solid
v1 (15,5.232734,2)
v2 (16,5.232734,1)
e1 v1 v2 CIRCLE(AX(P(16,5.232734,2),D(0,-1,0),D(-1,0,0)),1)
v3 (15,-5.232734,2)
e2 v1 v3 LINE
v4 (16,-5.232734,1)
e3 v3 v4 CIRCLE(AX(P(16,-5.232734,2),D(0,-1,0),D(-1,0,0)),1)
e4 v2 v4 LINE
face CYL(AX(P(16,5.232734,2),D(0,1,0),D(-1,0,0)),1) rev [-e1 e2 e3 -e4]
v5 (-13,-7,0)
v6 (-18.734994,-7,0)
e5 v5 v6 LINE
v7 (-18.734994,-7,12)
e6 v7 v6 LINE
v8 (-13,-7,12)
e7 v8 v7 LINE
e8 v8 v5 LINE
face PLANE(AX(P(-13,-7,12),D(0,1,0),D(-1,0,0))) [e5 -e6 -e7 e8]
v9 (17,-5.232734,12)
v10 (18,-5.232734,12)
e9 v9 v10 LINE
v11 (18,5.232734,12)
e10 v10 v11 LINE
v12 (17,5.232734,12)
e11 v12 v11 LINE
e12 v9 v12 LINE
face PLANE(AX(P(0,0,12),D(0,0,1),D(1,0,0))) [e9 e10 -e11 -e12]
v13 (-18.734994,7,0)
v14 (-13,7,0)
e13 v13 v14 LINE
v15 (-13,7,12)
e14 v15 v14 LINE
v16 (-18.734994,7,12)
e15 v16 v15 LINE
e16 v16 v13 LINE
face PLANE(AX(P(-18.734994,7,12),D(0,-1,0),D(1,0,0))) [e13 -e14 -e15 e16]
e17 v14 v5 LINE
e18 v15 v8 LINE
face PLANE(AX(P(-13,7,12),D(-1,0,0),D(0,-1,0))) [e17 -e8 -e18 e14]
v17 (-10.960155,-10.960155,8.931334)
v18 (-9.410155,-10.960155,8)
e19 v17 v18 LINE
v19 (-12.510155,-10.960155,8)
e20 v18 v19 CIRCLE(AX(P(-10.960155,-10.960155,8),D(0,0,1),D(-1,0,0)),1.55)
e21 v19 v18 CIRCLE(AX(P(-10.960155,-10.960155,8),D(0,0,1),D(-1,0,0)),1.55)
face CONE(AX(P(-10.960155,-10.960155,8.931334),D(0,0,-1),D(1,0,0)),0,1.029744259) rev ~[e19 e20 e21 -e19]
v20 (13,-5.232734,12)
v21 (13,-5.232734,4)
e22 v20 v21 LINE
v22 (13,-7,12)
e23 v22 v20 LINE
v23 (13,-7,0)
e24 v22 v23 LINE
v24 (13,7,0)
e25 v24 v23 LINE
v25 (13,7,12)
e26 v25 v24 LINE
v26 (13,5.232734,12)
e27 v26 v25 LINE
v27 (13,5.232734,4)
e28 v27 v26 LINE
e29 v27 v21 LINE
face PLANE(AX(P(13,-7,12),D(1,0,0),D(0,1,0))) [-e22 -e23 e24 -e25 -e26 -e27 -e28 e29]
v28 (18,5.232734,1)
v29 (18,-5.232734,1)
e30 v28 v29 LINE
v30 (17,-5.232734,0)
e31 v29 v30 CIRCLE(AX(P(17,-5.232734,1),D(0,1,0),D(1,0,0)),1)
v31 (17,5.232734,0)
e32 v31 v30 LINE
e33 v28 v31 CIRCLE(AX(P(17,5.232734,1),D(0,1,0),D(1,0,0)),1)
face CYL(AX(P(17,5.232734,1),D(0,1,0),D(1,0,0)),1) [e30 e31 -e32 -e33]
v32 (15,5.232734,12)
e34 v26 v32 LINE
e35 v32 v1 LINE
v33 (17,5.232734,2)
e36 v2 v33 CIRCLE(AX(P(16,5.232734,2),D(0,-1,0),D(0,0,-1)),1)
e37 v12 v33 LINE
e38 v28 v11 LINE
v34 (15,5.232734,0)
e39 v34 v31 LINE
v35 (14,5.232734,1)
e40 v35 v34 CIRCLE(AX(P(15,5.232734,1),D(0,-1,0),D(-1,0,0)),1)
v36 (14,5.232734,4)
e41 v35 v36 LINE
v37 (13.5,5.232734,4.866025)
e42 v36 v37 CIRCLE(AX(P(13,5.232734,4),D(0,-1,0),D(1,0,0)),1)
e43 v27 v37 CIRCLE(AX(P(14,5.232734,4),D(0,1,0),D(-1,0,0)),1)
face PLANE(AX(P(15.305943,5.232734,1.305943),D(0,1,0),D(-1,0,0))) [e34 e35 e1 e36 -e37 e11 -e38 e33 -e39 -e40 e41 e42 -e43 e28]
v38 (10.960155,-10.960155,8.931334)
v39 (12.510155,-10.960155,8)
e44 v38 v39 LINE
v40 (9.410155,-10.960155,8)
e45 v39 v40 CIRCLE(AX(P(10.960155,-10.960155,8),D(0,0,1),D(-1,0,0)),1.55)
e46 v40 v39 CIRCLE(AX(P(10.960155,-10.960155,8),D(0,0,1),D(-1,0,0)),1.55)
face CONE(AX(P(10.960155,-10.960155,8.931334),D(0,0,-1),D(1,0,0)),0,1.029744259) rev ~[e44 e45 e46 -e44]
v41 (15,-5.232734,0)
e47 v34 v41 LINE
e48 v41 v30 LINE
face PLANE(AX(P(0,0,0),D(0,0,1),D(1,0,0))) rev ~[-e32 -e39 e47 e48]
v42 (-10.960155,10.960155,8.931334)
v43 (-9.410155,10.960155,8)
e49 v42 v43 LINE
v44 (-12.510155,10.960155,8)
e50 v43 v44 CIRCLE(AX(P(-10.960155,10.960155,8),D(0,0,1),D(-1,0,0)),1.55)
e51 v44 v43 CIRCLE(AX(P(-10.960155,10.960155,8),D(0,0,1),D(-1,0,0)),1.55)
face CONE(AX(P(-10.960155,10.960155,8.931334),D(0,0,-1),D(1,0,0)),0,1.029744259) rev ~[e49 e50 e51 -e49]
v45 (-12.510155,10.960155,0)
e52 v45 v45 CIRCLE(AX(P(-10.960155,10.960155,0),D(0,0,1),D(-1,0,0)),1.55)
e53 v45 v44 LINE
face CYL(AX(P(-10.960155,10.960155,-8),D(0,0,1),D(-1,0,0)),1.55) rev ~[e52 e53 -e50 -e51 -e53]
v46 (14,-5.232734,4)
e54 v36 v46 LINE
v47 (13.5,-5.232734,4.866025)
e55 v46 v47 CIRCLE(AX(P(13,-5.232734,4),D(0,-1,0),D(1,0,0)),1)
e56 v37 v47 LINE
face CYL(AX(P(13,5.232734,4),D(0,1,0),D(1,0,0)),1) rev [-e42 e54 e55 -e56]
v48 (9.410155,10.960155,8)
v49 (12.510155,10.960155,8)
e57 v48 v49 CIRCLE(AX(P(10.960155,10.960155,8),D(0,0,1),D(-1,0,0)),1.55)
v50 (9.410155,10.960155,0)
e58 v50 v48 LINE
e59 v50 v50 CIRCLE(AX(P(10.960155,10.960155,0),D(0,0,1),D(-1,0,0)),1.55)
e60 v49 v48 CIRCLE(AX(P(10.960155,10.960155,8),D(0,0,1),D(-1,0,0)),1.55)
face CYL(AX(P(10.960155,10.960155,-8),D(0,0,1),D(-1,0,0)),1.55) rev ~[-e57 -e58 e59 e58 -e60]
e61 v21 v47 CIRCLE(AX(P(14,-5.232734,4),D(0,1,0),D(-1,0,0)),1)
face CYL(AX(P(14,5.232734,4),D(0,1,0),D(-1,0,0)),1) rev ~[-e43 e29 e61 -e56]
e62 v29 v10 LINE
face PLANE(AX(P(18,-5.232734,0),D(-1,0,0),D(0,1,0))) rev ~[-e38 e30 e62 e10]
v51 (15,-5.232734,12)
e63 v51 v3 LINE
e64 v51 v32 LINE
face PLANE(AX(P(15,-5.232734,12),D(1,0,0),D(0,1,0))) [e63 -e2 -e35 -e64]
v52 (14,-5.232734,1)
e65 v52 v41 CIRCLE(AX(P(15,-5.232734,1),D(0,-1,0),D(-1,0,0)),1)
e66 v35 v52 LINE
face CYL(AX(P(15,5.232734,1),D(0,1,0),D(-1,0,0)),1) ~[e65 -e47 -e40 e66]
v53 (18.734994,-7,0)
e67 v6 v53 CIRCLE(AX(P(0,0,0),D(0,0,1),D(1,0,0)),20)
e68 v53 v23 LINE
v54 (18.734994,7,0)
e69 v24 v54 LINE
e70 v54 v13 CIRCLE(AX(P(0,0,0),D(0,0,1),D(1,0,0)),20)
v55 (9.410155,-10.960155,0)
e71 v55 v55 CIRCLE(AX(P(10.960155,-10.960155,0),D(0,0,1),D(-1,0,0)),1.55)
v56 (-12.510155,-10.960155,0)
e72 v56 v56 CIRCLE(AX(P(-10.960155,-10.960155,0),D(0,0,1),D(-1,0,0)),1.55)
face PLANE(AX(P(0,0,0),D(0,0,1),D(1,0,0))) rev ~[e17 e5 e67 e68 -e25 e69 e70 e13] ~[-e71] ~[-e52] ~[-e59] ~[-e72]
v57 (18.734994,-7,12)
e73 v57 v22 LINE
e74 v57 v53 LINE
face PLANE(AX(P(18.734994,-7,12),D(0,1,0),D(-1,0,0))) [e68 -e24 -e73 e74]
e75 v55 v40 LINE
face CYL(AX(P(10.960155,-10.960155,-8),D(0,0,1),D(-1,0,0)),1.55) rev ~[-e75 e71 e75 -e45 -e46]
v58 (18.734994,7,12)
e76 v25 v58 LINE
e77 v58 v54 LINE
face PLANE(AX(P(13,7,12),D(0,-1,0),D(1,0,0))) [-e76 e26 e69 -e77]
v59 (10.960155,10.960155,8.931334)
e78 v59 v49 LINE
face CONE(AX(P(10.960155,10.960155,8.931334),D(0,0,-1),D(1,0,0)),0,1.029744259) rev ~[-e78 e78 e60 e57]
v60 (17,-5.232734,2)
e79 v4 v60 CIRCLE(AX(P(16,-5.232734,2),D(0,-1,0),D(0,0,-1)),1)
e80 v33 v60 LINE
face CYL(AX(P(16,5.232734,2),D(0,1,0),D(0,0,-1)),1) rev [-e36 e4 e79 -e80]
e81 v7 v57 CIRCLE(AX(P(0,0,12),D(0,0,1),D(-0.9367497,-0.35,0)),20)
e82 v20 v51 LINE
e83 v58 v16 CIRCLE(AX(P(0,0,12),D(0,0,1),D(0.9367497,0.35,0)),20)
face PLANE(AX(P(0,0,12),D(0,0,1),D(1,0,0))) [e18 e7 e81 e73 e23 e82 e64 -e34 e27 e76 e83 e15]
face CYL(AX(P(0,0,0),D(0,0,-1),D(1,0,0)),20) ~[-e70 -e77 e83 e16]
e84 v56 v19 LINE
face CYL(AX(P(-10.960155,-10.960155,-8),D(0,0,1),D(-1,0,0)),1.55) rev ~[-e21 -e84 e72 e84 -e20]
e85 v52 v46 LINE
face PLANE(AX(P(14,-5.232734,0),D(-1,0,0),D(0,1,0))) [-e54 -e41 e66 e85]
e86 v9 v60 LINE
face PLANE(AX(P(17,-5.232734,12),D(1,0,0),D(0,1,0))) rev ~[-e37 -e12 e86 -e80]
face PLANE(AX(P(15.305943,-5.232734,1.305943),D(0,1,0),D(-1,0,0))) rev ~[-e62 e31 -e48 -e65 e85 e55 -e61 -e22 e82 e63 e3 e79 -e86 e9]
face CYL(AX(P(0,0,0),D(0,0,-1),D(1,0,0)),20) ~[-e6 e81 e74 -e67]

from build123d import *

# Parameters (mm, degrees)
F0_R         = 20
F1_DEPTH     = 12
F3_D         = 3.1
F3_DEPTH     = 8
F3_TIP       = 0.9313339595
F5_DEPTH     = 12.001
F6_W         = 5
F6_H         = 10.46546828
F7_DEPTH     = 12
F8_W         = 2
F8_H         = 10.46546828
F9_DEPTH     = 11
F10_W        = 1
F10_H        = 10.46546828
F11_DEPTH    = 5
F12_T1_DEPTH = 10.46546828
F12_T3_DEPTH = 10.46546828


# Not quite as in the source:
# - a fillet or chamfer that OpenCascade refuses, or shapes differently, is made with other operations: its cross-section is extruded or revolved along the edge and cut away or added


with BuildPart() as f1:
    # F0 (on Top) → F1 (new body)
    with BuildSketch(Plane.XY):
        Circle(F0_R)
    extrude(amount=F1_DEPTH)

    # F3
    with Locations(Plane(origin=(0, 0, 0), x_dir=(1, 0, 0), z_dir=(0, 0, -1))):
        with Locations((-10.9601551084, 10.9601551084), (-10.9601551084, -10.9601551084), (10.9601551084, -10.9601551084), (10.9601551084, 10.9601551084)):
            Hole(F3_D / 2, depth=F3_DEPTH)
            with Locations((0, 0, -(F3_DEPTH + F3_TIP / 2))):  # 118° drill point
                Cone(0, F3_D / 2, F3_TIP, mode=Mode.SUBTRACT)

    # F4 (on face) → F5 (intersect, through all)
    with BuildSketch(Plane.XY.offset(12)):
        with BuildLine():
            Line((13, -7), (13, 7))
            Line((13, 7), (18.7349939952, 7))
            ThreePointArc((18.7349939952, 7), (0, 20), (-18.7349939952, 7))
            Line((-18.7349939952, 7), (-13, 7))
            Line((-13, 7), (-13, -7))
            Line((-13, -7), (-18.7349939952, -7))
            ThreePointArc((-18.7349939952, -7), (0, -20), (18.7349939952, -7))
            Line((18.7349939952, -7), (13, -7))
        make_face()
    extrude(amount=-F5_DEPTH, mode=Mode.INTERSECT)

    # F6 (on Top) → F7 (join)
    with BuildSketch(Plane.XY):
        with Locations((15.5, 0)):
            Rectangle(F6_W, F6_H)
    extrude(amount=F7_DEPTH)

    # F8 (on face) → F9 (cut)
    with BuildSketch(Plane.XY.offset(12)):
        with Locations((16, 0)):
            Rectangle(F8_W, F8_H)
    extrude(amount=-F9_DEPTH, mode=Mode.SUBTRACT)

    # F10 (on Top) → F11 (cut)
    with BuildSketch(Plane.XY):
        with Locations((13.5, 0)):
            Rectangle(F10_W, F10_H)
    extrude(amount=F11_DEPTH, mode=Mode.SUBTRACT)

    # F12: fillet of radius 1 on 6 edges, made by hand

    # F12_s2 → F12_t1 (join)
    with BuildSketch(Plane.XZ.offset(-5.23273414)):
        with BuildLine():
            ThreePointArc((15, 2), (15.2928932188, 1.2928932188), (16, 1))
            Line((16, 1), (15, 1))
            Line((15, 1), (15, 2))
        make_face()
        with BuildLine():
            ThreePointArc((16, 1), (16.7071067812, 1.2928932188), (17, 2))
            Line((17, 2), (17, 1))
            Line((17, 1), (16, 1))
        make_face()
        with BuildLine():
            ThreePointArc((14, 4), (13.7071067812, 4.7071067812), (13, 5))
            Line((13, 5), (14, 5))
            Line((14, 5), (14, 4))
        make_face()
        with BuildLine():
            ThreePointArc((13, 4), (13.2928932188, 4.7071067812), (14, 5))
            Line((14, 5), (13, 5))
            Line((13, 5), (13, 4))
        make_face()
    extrude(amount=F12_T1_DEPTH)

    # F12_s4 → F12_t3 (cut)
    with BuildSketch(Plane.XZ.offset(-5.23273414)):
        with BuildLine():
            ThreePointArc((18, 1), (17.7071067812, 0.2928932188), (17, 0))
            Line((17, 0), (18, 0))
            Line((18, 0), (18, 1))
        make_face()
        with BuildLine():
            ThreePointArc((14, 1), (14.2928932188, 0.2928932188), (15, 0))
            Line((15, 0), (14, 0))
            Line((14, 0), (14, 1))
        make_face()
    extrude(amount=F12_T3_DEPTH, mode=Mode.SUBTRACT)


solid = f1.part
